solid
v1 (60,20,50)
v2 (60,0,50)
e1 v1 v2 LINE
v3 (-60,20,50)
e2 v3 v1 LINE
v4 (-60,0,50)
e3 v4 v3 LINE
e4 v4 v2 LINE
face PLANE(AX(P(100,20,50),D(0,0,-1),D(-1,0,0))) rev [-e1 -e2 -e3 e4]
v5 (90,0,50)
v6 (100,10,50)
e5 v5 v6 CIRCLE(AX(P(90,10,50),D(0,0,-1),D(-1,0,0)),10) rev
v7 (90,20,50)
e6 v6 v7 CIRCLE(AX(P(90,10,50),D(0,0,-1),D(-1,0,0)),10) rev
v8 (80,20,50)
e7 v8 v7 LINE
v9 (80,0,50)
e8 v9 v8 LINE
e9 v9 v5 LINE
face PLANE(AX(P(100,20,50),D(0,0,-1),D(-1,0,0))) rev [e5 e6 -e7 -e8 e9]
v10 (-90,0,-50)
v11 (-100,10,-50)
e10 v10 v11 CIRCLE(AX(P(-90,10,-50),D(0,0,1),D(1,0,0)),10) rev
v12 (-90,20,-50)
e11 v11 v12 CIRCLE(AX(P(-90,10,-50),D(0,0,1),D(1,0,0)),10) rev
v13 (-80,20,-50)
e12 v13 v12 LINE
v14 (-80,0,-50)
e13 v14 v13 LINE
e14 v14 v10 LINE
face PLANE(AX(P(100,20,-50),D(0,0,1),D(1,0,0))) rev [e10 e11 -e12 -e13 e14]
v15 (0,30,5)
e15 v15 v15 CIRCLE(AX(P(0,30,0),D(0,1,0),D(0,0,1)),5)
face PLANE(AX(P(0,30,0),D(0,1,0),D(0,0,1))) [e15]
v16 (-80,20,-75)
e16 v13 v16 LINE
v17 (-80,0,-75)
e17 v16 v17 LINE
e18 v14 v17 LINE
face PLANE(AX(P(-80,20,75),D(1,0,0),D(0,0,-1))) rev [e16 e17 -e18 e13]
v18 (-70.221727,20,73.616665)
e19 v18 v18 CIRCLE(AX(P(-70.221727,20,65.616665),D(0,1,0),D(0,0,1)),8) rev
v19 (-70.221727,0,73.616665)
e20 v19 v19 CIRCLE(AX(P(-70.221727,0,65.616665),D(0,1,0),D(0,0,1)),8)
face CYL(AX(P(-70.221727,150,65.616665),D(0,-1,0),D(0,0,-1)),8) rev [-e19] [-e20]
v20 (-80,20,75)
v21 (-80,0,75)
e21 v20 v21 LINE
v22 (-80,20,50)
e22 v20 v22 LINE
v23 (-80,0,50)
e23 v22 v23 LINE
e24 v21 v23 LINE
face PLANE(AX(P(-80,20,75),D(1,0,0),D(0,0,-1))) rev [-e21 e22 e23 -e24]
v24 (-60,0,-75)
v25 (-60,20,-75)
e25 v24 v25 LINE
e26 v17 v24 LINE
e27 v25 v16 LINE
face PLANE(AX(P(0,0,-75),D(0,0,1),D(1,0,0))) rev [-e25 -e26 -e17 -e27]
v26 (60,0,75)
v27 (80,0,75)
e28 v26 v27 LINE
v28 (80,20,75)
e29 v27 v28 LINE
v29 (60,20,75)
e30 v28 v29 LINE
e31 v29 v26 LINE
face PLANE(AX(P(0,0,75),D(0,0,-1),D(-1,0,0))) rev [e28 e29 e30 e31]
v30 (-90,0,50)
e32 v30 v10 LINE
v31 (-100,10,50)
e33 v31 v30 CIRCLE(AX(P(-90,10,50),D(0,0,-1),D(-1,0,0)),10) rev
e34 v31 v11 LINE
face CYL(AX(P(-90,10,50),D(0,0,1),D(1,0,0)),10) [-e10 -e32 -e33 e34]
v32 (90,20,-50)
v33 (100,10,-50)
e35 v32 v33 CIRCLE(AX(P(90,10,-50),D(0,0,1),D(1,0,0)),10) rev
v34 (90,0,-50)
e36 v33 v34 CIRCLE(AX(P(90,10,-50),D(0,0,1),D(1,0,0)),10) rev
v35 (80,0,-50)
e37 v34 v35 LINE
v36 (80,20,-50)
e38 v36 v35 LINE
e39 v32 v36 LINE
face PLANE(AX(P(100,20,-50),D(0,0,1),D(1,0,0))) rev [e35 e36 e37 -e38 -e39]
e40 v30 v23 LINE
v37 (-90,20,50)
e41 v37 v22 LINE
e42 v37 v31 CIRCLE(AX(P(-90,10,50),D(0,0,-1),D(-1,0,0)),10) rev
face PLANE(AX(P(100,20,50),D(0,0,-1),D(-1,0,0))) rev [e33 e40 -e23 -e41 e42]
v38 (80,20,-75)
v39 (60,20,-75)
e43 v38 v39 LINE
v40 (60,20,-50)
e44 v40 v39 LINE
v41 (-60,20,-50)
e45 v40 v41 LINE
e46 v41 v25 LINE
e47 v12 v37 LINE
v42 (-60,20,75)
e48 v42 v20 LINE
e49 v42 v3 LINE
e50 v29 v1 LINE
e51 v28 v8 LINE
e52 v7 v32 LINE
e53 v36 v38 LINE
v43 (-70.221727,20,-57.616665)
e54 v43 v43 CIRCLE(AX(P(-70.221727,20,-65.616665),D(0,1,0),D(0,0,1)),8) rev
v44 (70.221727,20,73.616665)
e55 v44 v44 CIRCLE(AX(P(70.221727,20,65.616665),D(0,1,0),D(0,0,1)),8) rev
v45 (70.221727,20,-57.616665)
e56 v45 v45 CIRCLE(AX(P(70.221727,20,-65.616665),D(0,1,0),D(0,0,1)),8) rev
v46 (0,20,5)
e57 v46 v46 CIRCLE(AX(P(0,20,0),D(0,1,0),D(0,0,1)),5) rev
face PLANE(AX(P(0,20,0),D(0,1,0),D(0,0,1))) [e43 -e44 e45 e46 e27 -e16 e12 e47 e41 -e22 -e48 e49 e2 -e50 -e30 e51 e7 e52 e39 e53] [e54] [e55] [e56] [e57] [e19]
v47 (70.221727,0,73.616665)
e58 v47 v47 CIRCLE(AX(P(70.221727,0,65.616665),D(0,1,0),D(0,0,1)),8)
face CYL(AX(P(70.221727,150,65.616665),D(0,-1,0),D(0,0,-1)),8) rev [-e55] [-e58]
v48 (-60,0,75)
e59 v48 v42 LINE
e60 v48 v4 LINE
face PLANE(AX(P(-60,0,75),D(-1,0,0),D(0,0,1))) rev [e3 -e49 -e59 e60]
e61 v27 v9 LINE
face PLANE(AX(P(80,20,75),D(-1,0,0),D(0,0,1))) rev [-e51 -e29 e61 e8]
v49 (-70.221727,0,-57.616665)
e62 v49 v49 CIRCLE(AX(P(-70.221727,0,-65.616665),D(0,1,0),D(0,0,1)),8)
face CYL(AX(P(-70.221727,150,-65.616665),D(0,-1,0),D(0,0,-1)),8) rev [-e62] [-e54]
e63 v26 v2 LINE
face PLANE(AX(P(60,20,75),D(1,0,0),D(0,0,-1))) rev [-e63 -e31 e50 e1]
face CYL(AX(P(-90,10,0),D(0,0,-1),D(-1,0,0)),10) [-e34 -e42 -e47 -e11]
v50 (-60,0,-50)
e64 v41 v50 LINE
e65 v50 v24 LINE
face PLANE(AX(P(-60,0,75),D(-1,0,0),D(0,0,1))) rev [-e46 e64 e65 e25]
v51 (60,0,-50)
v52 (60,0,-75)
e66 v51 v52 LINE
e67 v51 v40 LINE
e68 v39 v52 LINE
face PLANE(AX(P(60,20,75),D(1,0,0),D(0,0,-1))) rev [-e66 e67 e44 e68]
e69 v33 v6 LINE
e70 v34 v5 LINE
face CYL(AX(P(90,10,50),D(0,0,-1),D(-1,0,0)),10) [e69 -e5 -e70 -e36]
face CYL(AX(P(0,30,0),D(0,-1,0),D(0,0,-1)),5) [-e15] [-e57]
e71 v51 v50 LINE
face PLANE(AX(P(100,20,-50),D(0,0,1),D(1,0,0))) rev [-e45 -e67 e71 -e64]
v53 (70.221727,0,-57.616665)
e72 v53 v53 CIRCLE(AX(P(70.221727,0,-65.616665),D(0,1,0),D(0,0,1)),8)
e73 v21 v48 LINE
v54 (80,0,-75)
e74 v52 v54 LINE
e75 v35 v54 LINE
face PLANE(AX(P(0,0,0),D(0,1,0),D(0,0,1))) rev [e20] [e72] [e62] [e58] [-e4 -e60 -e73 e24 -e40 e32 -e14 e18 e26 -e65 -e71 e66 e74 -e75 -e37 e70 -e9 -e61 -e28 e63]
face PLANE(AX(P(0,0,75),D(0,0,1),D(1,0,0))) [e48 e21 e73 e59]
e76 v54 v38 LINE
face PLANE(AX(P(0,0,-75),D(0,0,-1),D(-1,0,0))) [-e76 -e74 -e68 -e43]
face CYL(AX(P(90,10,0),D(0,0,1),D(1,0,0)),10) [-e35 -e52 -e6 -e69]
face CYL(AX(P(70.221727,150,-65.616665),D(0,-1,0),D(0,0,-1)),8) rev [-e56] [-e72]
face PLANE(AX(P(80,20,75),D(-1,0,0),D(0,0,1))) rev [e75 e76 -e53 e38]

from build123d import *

# Parameters (mm, degrees)
SKETCH1_W           = 200
SKETCH1_H           = 100
BOSS_EXTRUDE1_DEPTH = 20
SKETCH2_W           = 20
SKETCH2_H           = 20
BOSS_EXTRUDE2_DEPTH = 75
SKETCH3_W           = 20
SKETCH3_H           = 20
BOSS_EXTRUDE3_DEPTH = 75
SKETCH4_R           = 8
CUT_EXTRUDE1_DEPTH  = 150
SKETCH5_R           = 5
BOSS_EXTRUDE4_DEPTH = 30
FILLET3_R           = 10
FILLET4_R           = 10


with BuildPart() as part:
    # Sketch1 → Boss-Extrude1 (new body)
    with BuildSketch(Plane(origin=(0, 0, 0), x_dir=(1, 0, 0), z_dir=(0, 1, 0))):
        Rectangle(SKETCH1_W, SKETCH1_H)
    extrude(amount=BOSS_EXTRUDE1_DEPTH)

    # Sketch2 → Boss-Extrude2 (add, symmetric)
    with BuildSketch(Plane.XY):
        with Locations((-70, 10)):
            Rectangle(SKETCH2_W, SKETCH2_H)
    extrude(amount=BOSS_EXTRUDE2_DEPTH, both=True)

    # Sketch3 → Boss-Extrude3 (add, symmetric)
    with BuildSketch(Plane.XY):
        with Locations((70, 10)):
            Rectangle(SKETCH3_W, SKETCH3_H)
    extrude(amount=BOSS_EXTRUDE3_DEPTH, both=True)

    # Sketch4 → Cut-Extrude1 (cut)
    with BuildSketch(Plane(origin=(0, 0, 0), x_dir=(1, 0, 0), z_dir=(0, 1, 0))):
        with Locations(Location((-70.221727327, 65.616664793, 0), (0, 0, 270))):
            Circle(SKETCH4_R)
        with Locations(Location((70.221727327, 65.616664793, 0), (0, 0, 270))):
            Circle(SKETCH4_R)
        with Locations(Location((-70.221727327, -65.616664793, 0), (0, 0, 270))):
            Circle(SKETCH4_R)
        with Locations(Location((70.221727327, -65.616664793, 0), (0, 0, 270))):
            Circle(SKETCH4_R)
    extrude(amount=CUT_EXTRUDE1_DEPTH, mode=Mode.SUBTRACT)

    # Sketch5 → Boss-Extrude4 (add)
    with BuildSketch(Plane(origin=(0, 0, 0), x_dir=(1, 0, 0), z_dir=(0, 1, 0))):
        with Locations(Location((0, 0, 0), (0, 0, 270))):
            Circle(SKETCH5_R)
    extrude(amount=BOSS_EXTRUDE4_DEPTH)

    # Fillet3
    fillet3_edges = [part.edges().sort_by_distance(p)[0] for p in [
        (100, 0, 0),
        (100, 20, 0),
    ]]
    fillet(fillet3_edges, radius=FILLET3_R - 0.0001)  # a hair under: the kernel refuses the full size

    # Fillet4
    fillet4_edges = [part.edges().sort_by_distance(p)[0] for p in [
        (-100, 0, 0),
        (-100, 20, 0),
    ]]
    fillet(fillet4_edges, radius=FILLET4_R - 0.0001)  # a hair under: the kernel refuses the full size


solid = part.part
